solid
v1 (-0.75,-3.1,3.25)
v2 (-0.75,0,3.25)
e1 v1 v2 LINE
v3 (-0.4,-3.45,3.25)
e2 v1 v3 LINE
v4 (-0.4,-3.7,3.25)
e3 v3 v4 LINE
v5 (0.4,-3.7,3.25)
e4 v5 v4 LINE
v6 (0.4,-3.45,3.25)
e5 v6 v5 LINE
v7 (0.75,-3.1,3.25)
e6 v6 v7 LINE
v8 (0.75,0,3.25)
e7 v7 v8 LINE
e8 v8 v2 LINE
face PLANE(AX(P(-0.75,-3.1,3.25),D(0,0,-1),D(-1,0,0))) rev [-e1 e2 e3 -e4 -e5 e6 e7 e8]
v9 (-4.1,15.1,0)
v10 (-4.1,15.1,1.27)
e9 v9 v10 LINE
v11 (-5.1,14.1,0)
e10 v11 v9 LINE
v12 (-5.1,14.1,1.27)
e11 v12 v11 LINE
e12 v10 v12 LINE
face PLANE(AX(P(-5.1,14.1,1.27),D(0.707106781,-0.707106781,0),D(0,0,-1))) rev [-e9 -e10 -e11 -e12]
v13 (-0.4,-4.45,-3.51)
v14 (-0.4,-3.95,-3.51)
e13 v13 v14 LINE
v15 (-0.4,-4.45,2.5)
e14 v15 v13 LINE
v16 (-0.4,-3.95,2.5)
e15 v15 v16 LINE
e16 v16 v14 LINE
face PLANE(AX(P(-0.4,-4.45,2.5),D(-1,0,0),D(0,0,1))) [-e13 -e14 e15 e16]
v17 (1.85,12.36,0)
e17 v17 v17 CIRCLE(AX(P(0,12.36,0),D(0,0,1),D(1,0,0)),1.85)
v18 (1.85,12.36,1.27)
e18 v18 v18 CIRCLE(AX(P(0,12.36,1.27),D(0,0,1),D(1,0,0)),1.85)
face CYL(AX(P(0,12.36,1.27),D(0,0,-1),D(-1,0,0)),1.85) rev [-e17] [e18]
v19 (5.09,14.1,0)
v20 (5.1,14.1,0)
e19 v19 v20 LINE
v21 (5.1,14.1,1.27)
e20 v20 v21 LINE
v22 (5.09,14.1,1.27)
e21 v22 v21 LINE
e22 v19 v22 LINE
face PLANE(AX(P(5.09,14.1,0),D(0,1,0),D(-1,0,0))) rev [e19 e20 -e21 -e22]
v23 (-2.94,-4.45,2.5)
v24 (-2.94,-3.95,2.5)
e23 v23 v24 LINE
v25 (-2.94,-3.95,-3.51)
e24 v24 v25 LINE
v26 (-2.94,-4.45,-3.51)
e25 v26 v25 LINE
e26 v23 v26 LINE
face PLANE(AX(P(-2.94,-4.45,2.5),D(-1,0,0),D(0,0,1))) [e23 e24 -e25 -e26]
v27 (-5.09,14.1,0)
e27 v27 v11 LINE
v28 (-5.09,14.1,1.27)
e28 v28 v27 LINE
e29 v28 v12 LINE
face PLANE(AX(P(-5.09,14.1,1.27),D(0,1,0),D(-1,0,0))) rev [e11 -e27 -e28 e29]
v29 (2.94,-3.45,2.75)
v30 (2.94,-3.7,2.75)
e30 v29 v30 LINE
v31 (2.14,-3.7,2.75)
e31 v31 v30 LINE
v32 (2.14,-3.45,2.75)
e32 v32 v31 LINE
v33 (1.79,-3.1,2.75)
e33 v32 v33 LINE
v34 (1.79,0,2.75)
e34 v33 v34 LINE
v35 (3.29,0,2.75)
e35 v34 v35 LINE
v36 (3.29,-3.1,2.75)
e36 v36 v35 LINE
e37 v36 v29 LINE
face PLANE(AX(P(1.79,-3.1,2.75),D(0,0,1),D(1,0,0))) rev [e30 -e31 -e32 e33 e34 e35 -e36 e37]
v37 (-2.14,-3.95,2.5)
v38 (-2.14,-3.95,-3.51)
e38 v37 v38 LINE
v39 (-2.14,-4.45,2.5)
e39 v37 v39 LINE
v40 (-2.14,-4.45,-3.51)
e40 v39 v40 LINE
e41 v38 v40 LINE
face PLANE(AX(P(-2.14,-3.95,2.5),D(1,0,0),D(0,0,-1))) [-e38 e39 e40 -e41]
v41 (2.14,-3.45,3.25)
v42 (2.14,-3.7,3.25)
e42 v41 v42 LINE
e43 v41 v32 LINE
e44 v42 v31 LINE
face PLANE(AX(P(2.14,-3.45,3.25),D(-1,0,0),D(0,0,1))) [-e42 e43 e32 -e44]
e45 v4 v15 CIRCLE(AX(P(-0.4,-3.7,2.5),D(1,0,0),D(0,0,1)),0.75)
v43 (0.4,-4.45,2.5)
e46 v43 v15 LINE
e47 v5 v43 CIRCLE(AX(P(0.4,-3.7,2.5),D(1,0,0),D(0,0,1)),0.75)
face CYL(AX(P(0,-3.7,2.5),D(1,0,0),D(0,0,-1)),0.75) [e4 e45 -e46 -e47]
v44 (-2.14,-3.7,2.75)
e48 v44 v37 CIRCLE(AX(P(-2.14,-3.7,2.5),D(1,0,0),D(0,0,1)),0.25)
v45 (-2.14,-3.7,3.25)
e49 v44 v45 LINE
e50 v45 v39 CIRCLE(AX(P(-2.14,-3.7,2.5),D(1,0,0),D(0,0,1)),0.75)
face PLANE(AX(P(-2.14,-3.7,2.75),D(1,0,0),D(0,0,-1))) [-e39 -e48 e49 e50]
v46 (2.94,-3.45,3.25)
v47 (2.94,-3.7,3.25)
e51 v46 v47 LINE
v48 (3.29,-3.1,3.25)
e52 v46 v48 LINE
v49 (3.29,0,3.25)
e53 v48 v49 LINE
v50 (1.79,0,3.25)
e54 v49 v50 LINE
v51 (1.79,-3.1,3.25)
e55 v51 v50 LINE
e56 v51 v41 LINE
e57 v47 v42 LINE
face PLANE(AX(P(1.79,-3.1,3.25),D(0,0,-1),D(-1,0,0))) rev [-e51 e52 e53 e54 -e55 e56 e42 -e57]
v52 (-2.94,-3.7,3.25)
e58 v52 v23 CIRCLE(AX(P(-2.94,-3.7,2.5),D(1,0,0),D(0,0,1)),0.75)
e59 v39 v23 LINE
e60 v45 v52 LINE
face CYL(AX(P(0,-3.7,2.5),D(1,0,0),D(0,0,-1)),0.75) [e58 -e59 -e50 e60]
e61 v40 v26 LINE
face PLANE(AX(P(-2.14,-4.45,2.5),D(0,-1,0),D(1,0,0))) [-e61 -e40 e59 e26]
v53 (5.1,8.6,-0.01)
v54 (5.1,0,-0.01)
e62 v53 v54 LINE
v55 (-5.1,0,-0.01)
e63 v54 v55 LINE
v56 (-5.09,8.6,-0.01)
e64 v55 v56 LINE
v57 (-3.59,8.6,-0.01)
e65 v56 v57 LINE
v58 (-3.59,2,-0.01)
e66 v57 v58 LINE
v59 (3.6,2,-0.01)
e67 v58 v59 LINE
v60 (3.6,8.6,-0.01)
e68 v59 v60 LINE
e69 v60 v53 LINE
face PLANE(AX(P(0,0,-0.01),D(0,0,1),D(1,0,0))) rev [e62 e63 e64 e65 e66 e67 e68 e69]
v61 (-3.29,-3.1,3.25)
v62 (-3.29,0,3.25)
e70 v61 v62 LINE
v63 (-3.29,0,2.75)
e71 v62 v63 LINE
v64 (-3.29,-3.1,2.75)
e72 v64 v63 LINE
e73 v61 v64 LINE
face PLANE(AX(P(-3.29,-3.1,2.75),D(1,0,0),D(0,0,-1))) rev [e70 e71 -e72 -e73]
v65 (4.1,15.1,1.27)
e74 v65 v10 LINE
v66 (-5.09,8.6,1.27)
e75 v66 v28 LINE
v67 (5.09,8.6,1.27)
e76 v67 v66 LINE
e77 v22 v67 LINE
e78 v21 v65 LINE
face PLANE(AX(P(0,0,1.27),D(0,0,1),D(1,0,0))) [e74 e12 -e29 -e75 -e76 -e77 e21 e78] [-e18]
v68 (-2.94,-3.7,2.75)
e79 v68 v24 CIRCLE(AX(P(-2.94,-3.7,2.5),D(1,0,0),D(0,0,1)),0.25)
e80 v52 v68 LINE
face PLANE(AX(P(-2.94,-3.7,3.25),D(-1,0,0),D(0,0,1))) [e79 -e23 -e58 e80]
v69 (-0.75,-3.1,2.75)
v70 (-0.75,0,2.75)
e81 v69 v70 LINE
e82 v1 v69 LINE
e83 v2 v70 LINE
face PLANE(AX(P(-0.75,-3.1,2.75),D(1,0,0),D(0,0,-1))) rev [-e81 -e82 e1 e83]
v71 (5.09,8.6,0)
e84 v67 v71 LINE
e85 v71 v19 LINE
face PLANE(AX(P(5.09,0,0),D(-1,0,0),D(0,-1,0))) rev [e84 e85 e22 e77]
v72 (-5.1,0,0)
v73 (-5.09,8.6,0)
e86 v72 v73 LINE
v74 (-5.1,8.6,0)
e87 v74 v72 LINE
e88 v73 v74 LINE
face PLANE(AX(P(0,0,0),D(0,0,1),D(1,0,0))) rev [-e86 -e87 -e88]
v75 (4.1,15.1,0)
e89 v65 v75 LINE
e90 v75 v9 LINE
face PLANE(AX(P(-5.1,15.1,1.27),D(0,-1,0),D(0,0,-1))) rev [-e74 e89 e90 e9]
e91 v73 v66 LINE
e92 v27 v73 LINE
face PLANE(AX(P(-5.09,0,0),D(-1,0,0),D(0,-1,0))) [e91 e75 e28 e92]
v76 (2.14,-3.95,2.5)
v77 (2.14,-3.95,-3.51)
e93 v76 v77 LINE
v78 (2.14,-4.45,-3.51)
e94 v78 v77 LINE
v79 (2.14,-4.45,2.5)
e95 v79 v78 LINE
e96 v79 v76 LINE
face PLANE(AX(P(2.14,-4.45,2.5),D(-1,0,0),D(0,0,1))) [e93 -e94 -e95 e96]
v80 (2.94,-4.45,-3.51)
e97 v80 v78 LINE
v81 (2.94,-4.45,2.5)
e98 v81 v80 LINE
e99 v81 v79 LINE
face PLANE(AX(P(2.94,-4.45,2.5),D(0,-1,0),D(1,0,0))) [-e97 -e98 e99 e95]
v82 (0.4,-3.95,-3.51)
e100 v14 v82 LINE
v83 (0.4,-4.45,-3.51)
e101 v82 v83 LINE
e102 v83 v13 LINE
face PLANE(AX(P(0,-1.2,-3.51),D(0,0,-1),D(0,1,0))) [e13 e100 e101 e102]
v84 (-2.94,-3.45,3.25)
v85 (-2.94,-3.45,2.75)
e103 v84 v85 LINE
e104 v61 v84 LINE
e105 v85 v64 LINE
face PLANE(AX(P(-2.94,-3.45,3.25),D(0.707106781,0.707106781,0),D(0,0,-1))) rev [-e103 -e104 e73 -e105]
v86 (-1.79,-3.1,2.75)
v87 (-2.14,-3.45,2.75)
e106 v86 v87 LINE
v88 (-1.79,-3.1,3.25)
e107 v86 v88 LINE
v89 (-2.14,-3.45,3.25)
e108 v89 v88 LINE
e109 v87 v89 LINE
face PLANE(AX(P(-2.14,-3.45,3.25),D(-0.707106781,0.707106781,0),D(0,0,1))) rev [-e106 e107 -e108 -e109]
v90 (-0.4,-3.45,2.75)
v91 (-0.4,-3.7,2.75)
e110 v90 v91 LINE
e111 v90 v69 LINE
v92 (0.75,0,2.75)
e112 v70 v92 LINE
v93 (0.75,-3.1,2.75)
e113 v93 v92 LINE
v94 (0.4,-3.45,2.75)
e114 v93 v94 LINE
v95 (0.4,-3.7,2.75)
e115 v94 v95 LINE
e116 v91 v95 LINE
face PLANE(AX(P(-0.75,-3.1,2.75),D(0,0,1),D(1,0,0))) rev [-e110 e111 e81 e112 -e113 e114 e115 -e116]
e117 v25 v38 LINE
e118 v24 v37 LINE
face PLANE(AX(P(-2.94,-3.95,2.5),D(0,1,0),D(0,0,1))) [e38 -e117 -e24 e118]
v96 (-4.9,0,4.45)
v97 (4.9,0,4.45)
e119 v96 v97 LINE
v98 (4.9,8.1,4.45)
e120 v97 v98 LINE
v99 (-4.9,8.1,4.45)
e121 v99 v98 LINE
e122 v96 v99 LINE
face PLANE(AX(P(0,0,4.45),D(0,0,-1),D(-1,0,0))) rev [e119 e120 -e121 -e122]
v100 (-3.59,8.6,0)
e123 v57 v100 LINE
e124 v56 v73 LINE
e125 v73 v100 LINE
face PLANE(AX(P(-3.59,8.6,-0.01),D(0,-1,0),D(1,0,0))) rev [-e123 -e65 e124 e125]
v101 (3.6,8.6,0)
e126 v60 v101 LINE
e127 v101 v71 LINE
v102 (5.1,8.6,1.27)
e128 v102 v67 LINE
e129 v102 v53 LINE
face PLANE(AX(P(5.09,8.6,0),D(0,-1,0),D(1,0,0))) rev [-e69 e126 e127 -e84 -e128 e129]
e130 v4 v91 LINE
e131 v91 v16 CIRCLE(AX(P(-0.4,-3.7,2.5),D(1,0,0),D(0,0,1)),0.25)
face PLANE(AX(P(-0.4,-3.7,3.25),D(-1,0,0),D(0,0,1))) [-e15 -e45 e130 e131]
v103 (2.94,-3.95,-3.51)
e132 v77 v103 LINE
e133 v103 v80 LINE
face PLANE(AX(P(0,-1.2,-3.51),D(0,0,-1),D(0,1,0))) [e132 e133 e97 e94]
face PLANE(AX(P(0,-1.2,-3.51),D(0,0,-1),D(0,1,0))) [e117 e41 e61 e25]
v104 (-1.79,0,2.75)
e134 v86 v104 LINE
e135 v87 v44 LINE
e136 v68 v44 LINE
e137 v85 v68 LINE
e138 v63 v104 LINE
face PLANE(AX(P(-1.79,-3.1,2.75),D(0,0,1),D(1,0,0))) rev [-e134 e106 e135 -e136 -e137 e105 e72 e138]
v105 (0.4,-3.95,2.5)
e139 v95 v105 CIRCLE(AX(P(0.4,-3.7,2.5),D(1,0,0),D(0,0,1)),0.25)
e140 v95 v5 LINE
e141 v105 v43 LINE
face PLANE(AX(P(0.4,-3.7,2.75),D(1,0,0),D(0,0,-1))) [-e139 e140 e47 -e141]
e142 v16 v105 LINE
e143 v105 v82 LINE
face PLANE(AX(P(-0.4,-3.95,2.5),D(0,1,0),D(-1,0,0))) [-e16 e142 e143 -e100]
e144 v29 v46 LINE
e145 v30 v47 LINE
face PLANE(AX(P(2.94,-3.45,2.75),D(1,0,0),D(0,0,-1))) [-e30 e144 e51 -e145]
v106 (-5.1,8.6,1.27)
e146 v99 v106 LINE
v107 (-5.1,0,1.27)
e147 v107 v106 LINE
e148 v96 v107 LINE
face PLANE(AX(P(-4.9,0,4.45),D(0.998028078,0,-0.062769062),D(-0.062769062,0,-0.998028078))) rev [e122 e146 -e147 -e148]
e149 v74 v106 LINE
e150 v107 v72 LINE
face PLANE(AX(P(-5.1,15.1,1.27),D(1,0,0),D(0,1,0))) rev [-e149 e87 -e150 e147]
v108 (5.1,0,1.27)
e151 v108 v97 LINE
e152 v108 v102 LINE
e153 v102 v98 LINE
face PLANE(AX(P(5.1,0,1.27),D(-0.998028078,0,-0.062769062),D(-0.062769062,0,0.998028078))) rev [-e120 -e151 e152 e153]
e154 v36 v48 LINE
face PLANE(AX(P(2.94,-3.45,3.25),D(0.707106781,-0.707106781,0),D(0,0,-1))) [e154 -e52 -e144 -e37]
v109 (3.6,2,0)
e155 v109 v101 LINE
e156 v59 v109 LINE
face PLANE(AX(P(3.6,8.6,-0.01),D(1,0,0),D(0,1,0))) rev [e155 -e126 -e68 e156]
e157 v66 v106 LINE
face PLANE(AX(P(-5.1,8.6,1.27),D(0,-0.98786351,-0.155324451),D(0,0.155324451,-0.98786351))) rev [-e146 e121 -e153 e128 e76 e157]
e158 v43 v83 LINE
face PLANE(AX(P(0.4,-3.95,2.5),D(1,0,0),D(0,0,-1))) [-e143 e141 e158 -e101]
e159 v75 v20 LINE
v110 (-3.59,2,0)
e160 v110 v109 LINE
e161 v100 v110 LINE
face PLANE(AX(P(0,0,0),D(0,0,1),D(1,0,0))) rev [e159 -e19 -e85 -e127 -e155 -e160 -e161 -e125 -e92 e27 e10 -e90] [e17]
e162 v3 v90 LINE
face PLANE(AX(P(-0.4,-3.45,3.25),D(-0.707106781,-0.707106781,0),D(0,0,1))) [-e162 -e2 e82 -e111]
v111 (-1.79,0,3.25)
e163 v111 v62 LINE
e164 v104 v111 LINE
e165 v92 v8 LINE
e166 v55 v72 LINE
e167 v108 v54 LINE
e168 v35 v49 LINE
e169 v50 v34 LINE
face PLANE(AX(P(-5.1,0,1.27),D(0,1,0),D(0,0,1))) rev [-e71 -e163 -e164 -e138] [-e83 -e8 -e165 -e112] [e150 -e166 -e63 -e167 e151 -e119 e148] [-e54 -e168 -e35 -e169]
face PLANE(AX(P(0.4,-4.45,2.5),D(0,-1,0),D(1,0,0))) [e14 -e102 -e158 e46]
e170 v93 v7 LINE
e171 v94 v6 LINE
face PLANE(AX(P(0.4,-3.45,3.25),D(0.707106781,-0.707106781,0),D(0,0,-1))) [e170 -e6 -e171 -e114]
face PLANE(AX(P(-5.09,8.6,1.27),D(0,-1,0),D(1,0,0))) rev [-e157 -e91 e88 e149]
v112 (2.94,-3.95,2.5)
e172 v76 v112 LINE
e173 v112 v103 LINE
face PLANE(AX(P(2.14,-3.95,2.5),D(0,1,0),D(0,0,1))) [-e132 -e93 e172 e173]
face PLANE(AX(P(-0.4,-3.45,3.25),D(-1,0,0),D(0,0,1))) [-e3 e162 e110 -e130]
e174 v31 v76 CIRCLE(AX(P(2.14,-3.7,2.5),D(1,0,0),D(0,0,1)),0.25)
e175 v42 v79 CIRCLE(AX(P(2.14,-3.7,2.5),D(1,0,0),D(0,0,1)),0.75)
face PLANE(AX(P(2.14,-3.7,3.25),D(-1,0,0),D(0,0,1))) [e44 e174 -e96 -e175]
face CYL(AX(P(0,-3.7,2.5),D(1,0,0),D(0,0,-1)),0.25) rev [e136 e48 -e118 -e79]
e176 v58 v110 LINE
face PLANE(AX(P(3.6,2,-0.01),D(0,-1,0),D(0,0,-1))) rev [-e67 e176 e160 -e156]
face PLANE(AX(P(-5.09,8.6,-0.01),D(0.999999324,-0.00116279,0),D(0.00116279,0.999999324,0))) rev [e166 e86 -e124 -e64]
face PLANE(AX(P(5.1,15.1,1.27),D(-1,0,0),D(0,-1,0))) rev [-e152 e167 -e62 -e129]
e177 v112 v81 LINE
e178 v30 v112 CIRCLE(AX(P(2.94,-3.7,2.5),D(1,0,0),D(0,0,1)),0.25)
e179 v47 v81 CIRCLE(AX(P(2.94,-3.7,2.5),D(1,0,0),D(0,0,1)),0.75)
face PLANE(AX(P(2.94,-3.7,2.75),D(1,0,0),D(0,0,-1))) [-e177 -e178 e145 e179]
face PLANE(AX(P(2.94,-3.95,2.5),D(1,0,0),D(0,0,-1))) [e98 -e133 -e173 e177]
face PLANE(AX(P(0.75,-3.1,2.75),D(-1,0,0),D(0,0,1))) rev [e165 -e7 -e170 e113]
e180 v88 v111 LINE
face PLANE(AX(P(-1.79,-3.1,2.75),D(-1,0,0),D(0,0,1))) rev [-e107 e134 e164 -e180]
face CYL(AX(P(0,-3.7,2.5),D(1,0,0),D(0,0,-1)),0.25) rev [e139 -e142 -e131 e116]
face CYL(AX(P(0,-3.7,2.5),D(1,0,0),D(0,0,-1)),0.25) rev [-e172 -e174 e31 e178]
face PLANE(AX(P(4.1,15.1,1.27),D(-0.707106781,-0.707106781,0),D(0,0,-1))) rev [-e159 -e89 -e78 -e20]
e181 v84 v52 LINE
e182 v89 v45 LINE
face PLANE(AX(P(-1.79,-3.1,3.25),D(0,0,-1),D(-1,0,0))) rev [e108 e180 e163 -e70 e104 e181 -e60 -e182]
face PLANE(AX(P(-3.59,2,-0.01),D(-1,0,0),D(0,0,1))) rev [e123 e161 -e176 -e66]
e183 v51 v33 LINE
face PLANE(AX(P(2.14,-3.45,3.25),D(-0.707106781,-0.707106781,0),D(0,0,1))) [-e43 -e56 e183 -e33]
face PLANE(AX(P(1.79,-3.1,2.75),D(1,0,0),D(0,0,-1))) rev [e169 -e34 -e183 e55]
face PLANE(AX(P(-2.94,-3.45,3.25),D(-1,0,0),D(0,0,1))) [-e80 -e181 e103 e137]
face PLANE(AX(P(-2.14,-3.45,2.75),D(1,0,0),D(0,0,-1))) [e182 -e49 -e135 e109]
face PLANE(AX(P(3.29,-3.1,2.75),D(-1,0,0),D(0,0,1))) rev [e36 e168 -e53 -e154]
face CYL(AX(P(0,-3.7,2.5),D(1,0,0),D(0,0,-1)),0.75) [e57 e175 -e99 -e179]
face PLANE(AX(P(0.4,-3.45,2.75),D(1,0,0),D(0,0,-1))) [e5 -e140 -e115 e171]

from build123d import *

# Parameters (mm, degrees)
ESQUISSE1_W              = 10.2
ESQUISSE1_H              = 15.1
ESQUISSE1_R              = 1.85
BOSS_EXTRU_1_DEPTH       = 1.27
ESQUISSE2_W              = 10.2
ESQUISSE2_H              = 8.6
BOSS_EXTRU_2_DEPTH       = 3.18
ENL_V_MAT_EXTRU_1_DEPTH  = 11.944062317
ENL_V_MAT_EXTRU_2_DEPTH  = 19.757731739
ESQUISSE5_W              = 1.5
ESQUISSE5_H              = 0.5
BOSS_EXTRU_3_DEPTH       = 3.1
ESQUISSE6_W              = 0.8
ESQUISSE6_H              = 0.5
BOSS_EXTRU_4_DEPTH       = 3.5
CHANFREIN1_SIZE          = 0.35
CHANFREIN2_SIZE          = 1
ESQUISSE8_W              = 1.27
ESQUISSE8_H              = 5.5
ENL_V_MAT_EXTRU_4_DEPTH  = 0.01
ESQUISSE9_W              = 1.27
ESQUISSE9_H              = 5.5
ENL_V_MAT_EXTRU_5_DEPTH  = 0.01
BOSS_EXTRU_6_DEPTH       = 0.01
ESQUISSE12_W             = 5.88
ESQUISSE12_H             = 3.15
ENL_V_MAT_EXTRU_15_DEPTH = 17.267993115
BALAYAGE1_START          = -2.94
BALAYAGE1_DEPTH          = 0.8
BALAYAGE2_START          = 2.14
BALAYAGE2_DEPTH          = 0.8
BALAYAGE3_START          = -0.4
BALAYAGE3_DEPTH          = 0.8


# Read off the part's stored shape, not the designer's step: Balayage1, Balayage2, Balayage3
with BuildPart() as part:
    # Esquisse1 → Boss.-Extru.1 (new body)
    with BuildSketch(Plane.XY):
        with Locations((0, 7.55)):
            Rectangle(ESQUISSE1_W, ESQUISSE1_H)
        with Locations((0, 12.36)):
            Circle(ESQUISSE1_R, mode=Mode.SUBTRACT)
    extrude(amount=BOSS_EXTRU_1_DEPTH)

    # Esquisse2 → Boss.-Extru.2 (add)
    with BuildSketch(Plane.XY.offset(1.27)):
        with Locations((0, 4.3)):
            Rectangle(ESQUISSE2_W, ESQUISSE2_H)
    extrude(amount=BOSS_EXTRU_2_DEPTH)

    # Esquisse3 → Enlèv. mat.-Extru.1 (cut, through all)
    with BuildSketch(Plane(origin=(0, 8.6, 0), x_dir=(1, 0, 0), z_dir=(0, 1, 0))):
        Polygon((5.1, -1.27), (4.9, -4.45), (5.1, -4.45), align=None)
        Polygon((-5.1, -1.27), (-5.1, -4.45), (-4.9, -4.45), align=None)
    extrude(amount=-ENL_V_MAT_EXTRU_1_DEPTH, mode=Mode.SUBTRACT)

    # Esquisse4 → Enlèv. mat.-Extru.2 (cut, through all)
    with BuildSketch(Plane(origin=(5.1, 0, 0), x_dir=(0, 0, -1), z_dir=(1, 0, 0))):
        Polygon((-1.27, 8.6), (-4.45, 8.1), (-4.45, 8.6), align=None)
    extrude(amount=-ENL_V_MAT_EXTRU_2_DEPTH, mode=Mode.SUBTRACT)

    # Esquisse5 → Boss.-Extru.3 (add)
    with BuildSketch(Plane.XZ):
        with Locations((0, 3)):
            Rectangle(ESQUISSE5_W, ESQUISSE5_H)
        with Locations((2.54, 3)):
            Rectangle(ESQUISSE5_W, ESQUISSE5_H)
        with Locations((-2.54, 3)):
            Rectangle(ESQUISSE5_W, ESQUISSE5_H)
    extrude(amount=BOSS_EXTRU_3_DEPTH)

    # Esquisse6 → Boss.-Extru.4 (add)
    with BuildSketch(Plane.XZ.offset(3.1)):
        with Locations((-2.54, 3)):
            Rectangle(ESQUISSE6_W, ESQUISSE6_H)
        with Locations((0, 3)):
            Rectangle(ESQUISSE6_W, ESQUISSE6_H)
        with Locations((2.54, 3)):
            Rectangle(ESQUISSE6_W, ESQUISSE6_H)
    extrude(amount=BOSS_EXTRU_4_DEPTH)

    # Chanfrein1
    chanfrein1_edges = [part.edges().sort_by_distance(p)[0] for p in [
        (2.94, -3.1, 3),
        (0.4, -3.1, 3),
        (-2.14, -3.1, 3),
        (2.14, -3.1, 3),
        (-0.4, -3.1, 3),
        (-2.94, -3.1, 3),
    ]]
    chamfer(chanfrein1_edges, length=CHANFREIN1_SIZE - 0.0001)  # a hair under: the kernel refuses the full size

    # Chanfrein2
    chanfrein2_edges = [part.edges().sort_by_distance(p)[0] for p in [
        (-5.1, 15.1, 0.635),
        (5.1, 15.1, 0.635),
    ]]
    chamfer(chanfrein2_edges, length=CHANFREIN2_SIZE)

    # Esquisse8 → Enlèv. mat.-Extru.4 (cut)
    with BuildSketch(Plane(origin=(5.1, 0, 0), x_dir=(0, 0, -1), z_dir=(1, 0, 0))):
        with Locations((-0.635, 11.35)):
            Rectangle(ESQUISSE8_W, ESQUISSE8_H)
    extrude(amount=-ENL_V_MAT_EXTRU_4_DEPTH, mode=Mode.SUBTRACT)

    # Esquisse9 → Enlèv. mat.-Extru.5 (cut)
    with BuildSketch(Plane.ZY.offset(5.1)):
        with Locations((0.635, 11.35)):
            Rectangle(ESQUISSE9_W, ESQUISSE9_H)
    extrude(amount=-ENL_V_MAT_EXTRU_5_DEPTH, mode=Mode.SUBTRACT)

    # Esquisse11 → Boss.-Extru.6 (add)
    with BuildSketch(Plane(origin=(0, 0, 0), x_dir=(-1, 0, 0), z_dir=(0, 0, -1))):
        Polygon((-5.1, 0), (-5.1, 8.6), (-3.6, 8.6), (-3.6, 2), (3.59, 2), (3.59, 8.6), (5.09, 8.6), (5.1, 0), align=None)
    extrude(amount=BOSS_EXTRU_6_DEPTH)

    # Esquisse12 → Enlèv. mat.-Extru.15 (cut, through all)
    with BuildSketch(Plane.XY.offset(3.25)):
        with Locations((0, -5.025)):
            Rectangle(ESQUISSE12_W, ESQUISSE12_H)
    extrude(amount=-ENL_V_MAT_EXTRU_15_DEPTH, mode=Mode.SUBTRACT)

    # Balayage1 outline → Balayage1 (add)
    with BuildSketch(Plane.YZ.offset(BALAYAGE1_START)):
        with BuildLine():
            Line((-4.45, 2.5), (-4.45, -3.51))
            Line((-4.45, -3.51), (-3.95, -3.51))
            Line((-3.95, -3.51), (-3.95, 2.5))
            ThreePointArc((-3.95, 2.5), (-3.876776695, 2.676776695), (-3.7, 2.75))
            Line((-3.7, 2.75), (-3.45, 2.750000001))
            Line((-3.45, 2.750000001), (-3.45, 3.25))
            Line((-3.45, 3.25), (-3.7, 3.25))
            ThreePointArc((-3.7, 3.25), (-4.230330086, 3.030330086), (-4.45, 2.5))
        make_face()
    extrude(amount=BALAYAGE1_DEPTH)

    # Balayage2 outline → Balayage2 (add)
    with BuildSketch(Plane.YZ.offset(BALAYAGE2_START)):
        with BuildLine():
            Line((-4.45, 2.5), (-4.45, -3.51))
            Line((-4.45, -3.51), (-3.95, -3.51))
            Line((-3.95, -3.51), (-3.95, 2.5))
            ThreePointArc((-3.95, 2.5), (-3.876776695, 2.676776695), (-3.7, 2.75))
            Line((-3.7, 2.75), (-3.45, 2.750000001))
            Line((-3.45, 2.750000001), (-3.45, 3.25))
            Line((-3.45, 3.25), (-3.7, 3.25))
            ThreePointArc((-3.7, 3.25), (-4.230330086, 3.030330086), (-4.45, 2.5))
        make_face()
    extrude(amount=BALAYAGE2_DEPTH)

    # Balayage3 outline → Balayage3 (add)
    with BuildSketch(Plane.YZ.offset(BALAYAGE3_START)):
        with BuildLine():
            Line((-4.45, 2.5), (-4.45, -3.51))
            Line((-4.45, -3.51), (-3.95, -3.51))
            Line((-3.95, -3.51), (-3.95, 2.5))
            ThreePointArc((-3.95, 2.5), (-3.876776695, 2.676776695), (-3.7, 2.75))
            Line((-3.7, 2.75), (-3.45, 2.750000001))
            Line((-3.45, 2.750000001), (-3.45, 3.25))
            Line((-3.45, 3.25), (-3.7, 3.25))
            ThreePointArc((-3.7, 3.25), (-4.230330086, 3.030330086), (-4.45, 2.5))
        make_face()
    extrude(amount=BALAYAGE3_DEPTH)


solid = part.part
